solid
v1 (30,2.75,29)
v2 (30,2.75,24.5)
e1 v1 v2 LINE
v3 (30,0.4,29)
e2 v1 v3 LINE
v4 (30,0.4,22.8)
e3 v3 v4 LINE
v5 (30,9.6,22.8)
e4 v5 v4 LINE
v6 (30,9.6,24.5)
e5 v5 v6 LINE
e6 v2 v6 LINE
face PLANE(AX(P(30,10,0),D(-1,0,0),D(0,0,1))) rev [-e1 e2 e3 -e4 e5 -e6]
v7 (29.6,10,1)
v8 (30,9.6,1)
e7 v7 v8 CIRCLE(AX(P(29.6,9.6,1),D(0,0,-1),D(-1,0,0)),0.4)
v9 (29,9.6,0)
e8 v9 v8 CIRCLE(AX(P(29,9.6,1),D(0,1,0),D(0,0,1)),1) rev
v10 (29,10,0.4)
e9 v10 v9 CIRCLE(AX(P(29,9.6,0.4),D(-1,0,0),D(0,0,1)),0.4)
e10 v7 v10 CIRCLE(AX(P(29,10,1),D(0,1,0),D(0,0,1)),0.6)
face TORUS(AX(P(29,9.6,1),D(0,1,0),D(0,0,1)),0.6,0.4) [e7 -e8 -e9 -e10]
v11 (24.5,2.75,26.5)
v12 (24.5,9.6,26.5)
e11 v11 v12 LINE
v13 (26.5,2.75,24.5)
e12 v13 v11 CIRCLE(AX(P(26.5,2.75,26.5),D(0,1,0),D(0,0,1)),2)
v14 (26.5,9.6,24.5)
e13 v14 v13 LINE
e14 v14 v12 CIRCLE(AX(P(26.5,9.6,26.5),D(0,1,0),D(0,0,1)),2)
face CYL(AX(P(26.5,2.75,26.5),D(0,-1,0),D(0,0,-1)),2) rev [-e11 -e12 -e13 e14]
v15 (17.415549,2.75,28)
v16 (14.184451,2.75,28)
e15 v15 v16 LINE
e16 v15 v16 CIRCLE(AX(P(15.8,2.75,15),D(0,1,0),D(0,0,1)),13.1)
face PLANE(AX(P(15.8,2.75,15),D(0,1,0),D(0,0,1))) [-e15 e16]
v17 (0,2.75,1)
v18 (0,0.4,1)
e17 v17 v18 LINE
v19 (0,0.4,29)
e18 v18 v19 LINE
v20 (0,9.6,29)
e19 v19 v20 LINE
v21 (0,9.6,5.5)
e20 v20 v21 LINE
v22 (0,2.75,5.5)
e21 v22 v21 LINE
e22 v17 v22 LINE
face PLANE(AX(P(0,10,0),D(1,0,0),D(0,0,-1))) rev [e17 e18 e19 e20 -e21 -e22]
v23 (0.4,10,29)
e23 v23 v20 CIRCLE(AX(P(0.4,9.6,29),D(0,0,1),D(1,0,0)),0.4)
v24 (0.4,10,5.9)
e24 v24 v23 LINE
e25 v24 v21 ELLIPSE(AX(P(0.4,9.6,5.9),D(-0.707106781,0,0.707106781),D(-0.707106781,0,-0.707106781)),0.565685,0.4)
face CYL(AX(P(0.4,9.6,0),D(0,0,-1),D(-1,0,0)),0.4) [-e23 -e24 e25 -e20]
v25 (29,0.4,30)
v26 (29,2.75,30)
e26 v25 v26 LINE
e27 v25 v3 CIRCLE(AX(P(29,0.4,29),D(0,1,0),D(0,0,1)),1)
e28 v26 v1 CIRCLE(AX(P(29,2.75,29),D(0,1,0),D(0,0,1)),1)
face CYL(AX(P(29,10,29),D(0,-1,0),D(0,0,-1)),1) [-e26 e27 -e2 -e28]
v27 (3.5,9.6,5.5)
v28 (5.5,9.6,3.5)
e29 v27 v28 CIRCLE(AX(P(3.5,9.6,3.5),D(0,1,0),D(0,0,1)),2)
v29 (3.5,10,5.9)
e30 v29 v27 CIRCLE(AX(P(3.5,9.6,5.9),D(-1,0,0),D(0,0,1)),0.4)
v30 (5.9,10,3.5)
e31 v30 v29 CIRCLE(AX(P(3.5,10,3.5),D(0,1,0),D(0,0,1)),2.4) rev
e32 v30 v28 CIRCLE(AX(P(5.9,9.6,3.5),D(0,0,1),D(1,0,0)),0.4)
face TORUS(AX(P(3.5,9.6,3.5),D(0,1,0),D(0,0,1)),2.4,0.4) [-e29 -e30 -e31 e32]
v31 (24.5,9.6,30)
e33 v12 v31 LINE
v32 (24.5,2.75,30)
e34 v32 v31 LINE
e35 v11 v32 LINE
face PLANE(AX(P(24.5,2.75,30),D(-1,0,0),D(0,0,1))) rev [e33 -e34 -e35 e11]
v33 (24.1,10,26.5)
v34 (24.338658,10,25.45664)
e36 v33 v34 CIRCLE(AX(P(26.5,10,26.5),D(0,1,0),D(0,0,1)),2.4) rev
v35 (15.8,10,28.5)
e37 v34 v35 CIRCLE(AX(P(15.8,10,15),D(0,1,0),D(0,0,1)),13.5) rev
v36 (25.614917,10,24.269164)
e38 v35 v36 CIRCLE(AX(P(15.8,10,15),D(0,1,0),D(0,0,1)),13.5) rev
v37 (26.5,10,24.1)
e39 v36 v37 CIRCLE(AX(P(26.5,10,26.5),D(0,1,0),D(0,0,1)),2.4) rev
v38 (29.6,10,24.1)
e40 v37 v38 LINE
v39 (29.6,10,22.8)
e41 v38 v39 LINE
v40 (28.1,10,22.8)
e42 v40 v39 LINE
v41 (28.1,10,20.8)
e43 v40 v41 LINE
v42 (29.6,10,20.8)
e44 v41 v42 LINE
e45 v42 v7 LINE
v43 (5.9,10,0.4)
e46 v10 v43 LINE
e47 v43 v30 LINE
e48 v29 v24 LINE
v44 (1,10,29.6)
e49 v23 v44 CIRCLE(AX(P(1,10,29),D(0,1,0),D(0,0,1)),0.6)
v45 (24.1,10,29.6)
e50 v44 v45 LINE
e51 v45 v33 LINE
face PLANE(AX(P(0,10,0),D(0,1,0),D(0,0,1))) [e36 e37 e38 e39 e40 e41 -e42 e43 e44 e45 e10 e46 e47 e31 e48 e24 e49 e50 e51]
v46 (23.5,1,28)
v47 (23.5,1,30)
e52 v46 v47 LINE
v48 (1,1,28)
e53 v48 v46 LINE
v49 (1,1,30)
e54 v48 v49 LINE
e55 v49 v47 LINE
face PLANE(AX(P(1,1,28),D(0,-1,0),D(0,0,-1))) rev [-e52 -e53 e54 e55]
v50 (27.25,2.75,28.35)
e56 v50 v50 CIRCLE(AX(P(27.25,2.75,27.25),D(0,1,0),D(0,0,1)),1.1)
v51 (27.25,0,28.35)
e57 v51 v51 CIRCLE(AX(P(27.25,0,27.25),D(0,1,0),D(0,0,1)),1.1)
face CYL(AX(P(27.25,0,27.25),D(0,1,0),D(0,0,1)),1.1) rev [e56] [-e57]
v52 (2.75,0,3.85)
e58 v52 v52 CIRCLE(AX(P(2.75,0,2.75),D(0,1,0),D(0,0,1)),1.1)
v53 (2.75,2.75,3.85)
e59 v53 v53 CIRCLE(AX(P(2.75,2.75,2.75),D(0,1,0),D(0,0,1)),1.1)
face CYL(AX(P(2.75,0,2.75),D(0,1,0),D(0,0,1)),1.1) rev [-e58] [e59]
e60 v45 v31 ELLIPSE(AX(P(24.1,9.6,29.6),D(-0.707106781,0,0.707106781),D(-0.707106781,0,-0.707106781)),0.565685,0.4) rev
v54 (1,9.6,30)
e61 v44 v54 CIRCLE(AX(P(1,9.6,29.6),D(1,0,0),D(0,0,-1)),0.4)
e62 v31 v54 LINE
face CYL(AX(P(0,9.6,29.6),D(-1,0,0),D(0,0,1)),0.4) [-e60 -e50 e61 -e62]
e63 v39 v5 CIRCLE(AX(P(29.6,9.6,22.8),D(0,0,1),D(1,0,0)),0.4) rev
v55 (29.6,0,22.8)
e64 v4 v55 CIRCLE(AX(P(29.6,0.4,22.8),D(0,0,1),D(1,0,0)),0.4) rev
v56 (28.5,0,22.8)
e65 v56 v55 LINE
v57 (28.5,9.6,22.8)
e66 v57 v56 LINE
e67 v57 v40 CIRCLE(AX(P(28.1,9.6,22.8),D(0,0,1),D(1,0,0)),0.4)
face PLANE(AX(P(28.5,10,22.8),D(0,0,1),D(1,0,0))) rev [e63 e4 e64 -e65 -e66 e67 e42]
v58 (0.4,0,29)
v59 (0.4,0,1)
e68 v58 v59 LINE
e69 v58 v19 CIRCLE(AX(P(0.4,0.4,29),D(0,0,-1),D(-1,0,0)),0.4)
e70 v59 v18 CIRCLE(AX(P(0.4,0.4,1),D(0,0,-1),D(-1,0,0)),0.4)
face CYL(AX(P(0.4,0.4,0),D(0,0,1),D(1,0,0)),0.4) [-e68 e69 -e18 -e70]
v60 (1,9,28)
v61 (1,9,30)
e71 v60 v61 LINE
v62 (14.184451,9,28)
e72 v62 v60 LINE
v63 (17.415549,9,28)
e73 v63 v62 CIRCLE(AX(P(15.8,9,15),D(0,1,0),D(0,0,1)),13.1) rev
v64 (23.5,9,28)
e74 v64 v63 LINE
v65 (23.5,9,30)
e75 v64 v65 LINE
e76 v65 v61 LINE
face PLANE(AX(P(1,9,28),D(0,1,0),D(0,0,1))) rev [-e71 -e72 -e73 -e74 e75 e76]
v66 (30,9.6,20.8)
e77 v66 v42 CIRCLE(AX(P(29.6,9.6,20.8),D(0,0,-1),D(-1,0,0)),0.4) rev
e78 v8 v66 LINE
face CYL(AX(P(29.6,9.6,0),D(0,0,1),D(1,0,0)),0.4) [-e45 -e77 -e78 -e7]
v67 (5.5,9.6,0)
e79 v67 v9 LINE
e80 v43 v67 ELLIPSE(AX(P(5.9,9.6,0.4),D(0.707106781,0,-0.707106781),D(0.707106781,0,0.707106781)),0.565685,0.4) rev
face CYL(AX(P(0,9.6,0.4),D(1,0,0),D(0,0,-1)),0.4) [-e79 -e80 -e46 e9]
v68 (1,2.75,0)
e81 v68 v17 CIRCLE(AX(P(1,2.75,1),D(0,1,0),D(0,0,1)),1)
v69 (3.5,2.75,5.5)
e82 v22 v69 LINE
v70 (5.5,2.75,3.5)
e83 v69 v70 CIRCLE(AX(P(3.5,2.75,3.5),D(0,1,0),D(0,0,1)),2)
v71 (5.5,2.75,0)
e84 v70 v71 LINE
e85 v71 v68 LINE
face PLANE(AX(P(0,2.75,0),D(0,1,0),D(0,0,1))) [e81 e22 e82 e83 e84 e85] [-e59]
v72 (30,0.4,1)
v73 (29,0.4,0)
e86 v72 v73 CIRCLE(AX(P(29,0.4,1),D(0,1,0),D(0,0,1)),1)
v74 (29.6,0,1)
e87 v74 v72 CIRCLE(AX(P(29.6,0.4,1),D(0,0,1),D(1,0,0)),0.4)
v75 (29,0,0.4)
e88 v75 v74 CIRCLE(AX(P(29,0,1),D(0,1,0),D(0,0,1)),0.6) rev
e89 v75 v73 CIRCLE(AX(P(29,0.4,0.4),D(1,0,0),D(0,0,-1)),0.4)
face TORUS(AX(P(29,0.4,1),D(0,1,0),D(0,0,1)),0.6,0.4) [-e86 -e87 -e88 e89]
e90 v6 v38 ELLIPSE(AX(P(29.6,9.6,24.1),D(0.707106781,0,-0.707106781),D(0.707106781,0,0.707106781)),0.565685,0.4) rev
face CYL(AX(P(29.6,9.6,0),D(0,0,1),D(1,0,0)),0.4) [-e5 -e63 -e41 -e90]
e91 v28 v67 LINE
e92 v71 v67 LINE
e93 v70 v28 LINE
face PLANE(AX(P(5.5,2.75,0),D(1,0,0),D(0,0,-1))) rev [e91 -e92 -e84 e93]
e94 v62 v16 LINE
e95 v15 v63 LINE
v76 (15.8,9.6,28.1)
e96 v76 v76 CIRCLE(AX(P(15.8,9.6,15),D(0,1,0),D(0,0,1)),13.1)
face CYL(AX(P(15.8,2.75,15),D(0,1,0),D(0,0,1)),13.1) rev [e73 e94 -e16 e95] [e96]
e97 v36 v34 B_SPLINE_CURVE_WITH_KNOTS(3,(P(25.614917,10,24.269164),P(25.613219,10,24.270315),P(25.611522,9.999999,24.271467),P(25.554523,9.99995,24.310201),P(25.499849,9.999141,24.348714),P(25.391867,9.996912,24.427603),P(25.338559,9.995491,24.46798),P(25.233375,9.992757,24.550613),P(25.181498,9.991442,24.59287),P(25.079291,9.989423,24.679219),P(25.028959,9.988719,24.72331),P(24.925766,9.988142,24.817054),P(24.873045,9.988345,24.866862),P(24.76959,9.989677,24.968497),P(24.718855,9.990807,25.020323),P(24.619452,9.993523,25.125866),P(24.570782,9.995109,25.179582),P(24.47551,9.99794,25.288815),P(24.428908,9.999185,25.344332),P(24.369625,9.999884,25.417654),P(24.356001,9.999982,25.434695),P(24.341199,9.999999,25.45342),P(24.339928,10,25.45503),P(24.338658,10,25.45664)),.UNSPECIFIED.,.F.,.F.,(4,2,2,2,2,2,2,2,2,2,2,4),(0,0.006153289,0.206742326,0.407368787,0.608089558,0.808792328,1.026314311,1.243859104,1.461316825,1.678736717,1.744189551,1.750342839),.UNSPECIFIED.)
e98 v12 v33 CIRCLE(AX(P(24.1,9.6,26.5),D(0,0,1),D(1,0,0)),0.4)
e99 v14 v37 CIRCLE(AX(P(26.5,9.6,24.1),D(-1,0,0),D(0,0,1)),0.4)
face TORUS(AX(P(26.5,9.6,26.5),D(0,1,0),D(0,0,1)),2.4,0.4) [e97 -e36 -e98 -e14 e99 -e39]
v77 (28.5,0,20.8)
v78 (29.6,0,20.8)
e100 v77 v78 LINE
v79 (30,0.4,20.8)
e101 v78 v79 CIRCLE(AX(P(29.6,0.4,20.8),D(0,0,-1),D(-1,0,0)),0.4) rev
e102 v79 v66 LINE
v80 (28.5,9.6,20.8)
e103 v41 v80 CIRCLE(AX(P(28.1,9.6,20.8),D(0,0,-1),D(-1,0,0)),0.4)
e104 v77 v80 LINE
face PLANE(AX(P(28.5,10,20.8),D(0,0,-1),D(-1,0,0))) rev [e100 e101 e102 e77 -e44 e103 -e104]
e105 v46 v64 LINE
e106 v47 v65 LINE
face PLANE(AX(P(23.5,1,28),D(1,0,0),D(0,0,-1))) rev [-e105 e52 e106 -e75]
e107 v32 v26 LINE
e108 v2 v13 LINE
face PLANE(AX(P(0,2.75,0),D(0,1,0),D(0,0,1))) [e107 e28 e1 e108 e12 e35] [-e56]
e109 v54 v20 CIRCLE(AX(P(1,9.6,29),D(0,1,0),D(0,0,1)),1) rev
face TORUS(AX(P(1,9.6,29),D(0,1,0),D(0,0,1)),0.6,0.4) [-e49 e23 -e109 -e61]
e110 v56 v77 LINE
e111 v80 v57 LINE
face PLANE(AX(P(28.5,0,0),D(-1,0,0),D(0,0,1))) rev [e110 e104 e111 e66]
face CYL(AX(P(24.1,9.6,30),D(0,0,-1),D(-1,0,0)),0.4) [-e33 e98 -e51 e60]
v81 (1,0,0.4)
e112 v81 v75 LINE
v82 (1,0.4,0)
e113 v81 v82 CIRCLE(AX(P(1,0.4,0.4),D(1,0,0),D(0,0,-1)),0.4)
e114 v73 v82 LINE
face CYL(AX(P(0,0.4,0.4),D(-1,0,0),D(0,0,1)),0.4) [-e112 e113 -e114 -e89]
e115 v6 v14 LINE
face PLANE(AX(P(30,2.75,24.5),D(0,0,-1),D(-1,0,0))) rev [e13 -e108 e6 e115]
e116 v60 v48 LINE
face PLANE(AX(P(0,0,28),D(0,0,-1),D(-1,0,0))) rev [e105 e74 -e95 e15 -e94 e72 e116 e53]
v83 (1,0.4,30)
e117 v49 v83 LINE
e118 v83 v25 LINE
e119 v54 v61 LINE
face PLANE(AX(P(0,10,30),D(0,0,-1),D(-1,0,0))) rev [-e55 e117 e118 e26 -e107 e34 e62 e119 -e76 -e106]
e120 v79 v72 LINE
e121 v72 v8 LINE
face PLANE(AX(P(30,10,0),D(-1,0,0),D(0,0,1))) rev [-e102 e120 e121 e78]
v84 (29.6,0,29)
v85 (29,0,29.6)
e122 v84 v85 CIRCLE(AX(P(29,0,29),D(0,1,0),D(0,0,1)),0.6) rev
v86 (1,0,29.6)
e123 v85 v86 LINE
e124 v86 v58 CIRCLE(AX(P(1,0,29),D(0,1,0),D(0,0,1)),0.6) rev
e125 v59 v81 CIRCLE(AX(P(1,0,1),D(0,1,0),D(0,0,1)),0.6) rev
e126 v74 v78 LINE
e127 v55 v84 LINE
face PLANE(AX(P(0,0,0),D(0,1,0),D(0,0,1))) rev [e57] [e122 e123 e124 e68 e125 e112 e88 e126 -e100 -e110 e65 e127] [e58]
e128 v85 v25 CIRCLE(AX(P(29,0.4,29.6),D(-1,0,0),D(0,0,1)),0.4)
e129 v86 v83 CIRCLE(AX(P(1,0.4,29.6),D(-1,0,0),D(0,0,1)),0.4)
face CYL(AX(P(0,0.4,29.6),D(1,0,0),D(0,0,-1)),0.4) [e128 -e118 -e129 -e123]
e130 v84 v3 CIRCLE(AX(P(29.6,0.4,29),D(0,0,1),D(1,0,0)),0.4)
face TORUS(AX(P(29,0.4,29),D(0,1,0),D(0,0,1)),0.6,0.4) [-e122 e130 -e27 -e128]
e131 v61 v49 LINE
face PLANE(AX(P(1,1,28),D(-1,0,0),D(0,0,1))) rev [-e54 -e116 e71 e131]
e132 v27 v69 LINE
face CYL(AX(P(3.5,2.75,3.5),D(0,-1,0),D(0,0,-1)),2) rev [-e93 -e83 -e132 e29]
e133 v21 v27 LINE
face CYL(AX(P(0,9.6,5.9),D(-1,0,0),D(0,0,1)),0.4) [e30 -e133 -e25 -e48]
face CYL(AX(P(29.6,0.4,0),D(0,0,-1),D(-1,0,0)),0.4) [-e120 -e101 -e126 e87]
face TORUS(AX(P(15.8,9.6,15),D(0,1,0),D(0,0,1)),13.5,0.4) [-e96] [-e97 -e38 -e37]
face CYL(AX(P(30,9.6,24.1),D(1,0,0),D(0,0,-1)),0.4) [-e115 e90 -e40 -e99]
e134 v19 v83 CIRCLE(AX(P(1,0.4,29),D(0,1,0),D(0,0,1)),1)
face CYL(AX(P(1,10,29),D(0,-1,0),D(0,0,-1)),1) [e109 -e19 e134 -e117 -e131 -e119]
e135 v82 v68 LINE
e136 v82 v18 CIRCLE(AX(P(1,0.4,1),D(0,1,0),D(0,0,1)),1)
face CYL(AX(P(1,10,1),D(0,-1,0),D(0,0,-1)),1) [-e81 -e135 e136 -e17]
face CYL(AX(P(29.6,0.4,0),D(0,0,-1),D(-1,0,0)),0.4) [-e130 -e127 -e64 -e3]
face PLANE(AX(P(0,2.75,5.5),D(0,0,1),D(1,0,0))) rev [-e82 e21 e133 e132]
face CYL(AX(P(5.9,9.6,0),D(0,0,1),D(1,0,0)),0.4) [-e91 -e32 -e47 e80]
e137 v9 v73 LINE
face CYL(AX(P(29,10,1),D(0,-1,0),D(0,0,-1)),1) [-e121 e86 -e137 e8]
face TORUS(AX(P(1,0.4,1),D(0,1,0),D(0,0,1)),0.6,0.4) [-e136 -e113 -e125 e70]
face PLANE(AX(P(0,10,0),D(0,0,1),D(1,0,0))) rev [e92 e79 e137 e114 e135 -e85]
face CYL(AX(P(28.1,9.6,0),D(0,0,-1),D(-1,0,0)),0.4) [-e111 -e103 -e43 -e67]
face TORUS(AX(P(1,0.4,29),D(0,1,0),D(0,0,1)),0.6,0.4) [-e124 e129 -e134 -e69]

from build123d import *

# Parameters (mm, degrees)
SKETCH1_W           = 30
SKETCH1_H           = 30
BOSS_EXTRUDE1_DEPTH = 10
SKETCH2_W           = 5.5
SKETCH2_H           = 5.5
CUT_EXTRUDE1_DEPTH  = 7.25
FILLET1_R           = 2
SKETCH3_R           = 13.1
CUT_EXTRUDE2_DEPTH  = 7.25
SKETCH4_R           = 1.1
CUT_EXTRUDE3_DEPTH  = 44.041404485
SKETCH5_W           = 22.5
SKETCH5_H           = 8
CUT_EXTRUDE4_DEPTH  = 2
SKETCH6_W           = 2
SKETCH6_H           = 10
CUT_EXTRUDE5_DEPTH  = 1.5
FILLET2_R           = 1
FILLET3_R           = 0.4


# Some blends are built 0.0001 mm under size
with BuildPart() as part:
    # Sketch1 → Boss-Extrude1 (new body)
    with BuildSketch(Plane(origin=(0, 0, 0), x_dir=(1, 0, 0), z_dir=(0, 1, 0))):
        with Locations((15, -15)):
            Rectangle(SKETCH1_W, SKETCH1_H)
    extrude(amount=BOSS_EXTRUDE1_DEPTH)

    # Sketch2 → Cut-Extrude1 (cut)
    with BuildSketch(Plane(origin=(0, 10, 0), x_dir=(1, 0, 0), z_dir=(0, 1, 0))):
        with Locations((27.25, -27.25)):
            Rectangle(SKETCH2_W, SKETCH2_H)
        with Locations((2.75, -2.75)):
            Rectangle(SKETCH2_W, SKETCH2_H)
    extrude(amount=-CUT_EXTRUDE1_DEPTH, mode=Mode.SUBTRACT)

    # Fillet1
    fillet1_edges = [part.edges().sort_by_distance(p)[0] for p in [
        (24.5, 6.375, 24.5),
        (5.5, 6.375, 5.5),
    ]]
    fillet(fillet1_edges, radius=FILLET1_R)

    # Sketch3 → Cut-Extrude2 (cut)
    with BuildSketch(Plane(origin=(0, 10, 0), x_dir=(1, 0, 0), z_dir=(0, 1, 0))):
        with Locations(Location((15.8, -15, 0), (0, 0, 270))):
            Circle(SKETCH3_R)
    extrude(amount=-CUT_EXTRUDE2_DEPTH, mode=Mode.SUBTRACT)

    # Sketch4 → Cut-Extrude3 (cut, through all)
    with BuildSketch(Plane(origin=(0, 2.75, 0), x_dir=(1, 0, 0), z_dir=(0, 1, 0))):
        with Locations(Location((2.75, -2.75, 0), (0, 0, 270))):
            Circle(SKETCH4_R)
        with Locations(Location((27.25, -27.25, 0), (0, 0, 270))):
            Circle(SKETCH4_R)
    extrude(amount=-CUT_EXTRUDE3_DEPTH, mode=Mode.SUBTRACT)

    # Sketch5 → Cut-Extrude4 (cut)
    with BuildSketch(Plane.XY.offset(30)):
        with Locations((12.25, 5)):
            Rectangle(SKETCH5_W, SKETCH5_H)
    extrude(amount=-CUT_EXTRUDE4_DEPTH, mode=Mode.SUBTRACT)

    # Sketch6 → Cut-Extrude5 (cut)
    with BuildSketch(Plane(origin=(30, 0, 0), x_dir=(0, 0, -1), z_dir=(1, 0, 0))):
        with Locations((-21.8, 5)):
            Rectangle(SKETCH6_W, SKETCH6_H)
    extrude(amount=-CUT_EXTRUDE5_DEPTH, mode=Mode.SUBTRACT)

    # Fillet2
    fillet2_edges = [part.edges().sort_by_distance(p)[0] for p in [
        (30, 1.375, 30),
        (0, 1.375, 0),
        (30, 5, 0),
        (0, 5, 30),
    ]]
    fillet(fillet2_edges, radius=FILLET2_R - 0.0001)  # a hair under: the kernel refuses the full size

    # Fillet3
    # the kernel refuses this fillet: 0.4 mm, written as the material it takes off along each edge
    with BuildSketch(Plane(origin=(4.5, 10, 0), x_dir=(0, 0, 1), z_dir=(1, 0, 0)), Plane(origin=(25.5, 10, 30), x_dir=(0, 0, -1), z_dir=(-1, 0, 0)), Plane(origin=(0, 10, 29.0001), x_dir=(1, 0, 0), z_dir=(0, 0, -1))) as fillet3_piece_1:
        with BuildLine():
            CenterArc((FILLET3_R, FILLET3_R), FILLET3_R, 180, 90)
            Line((0, FILLET3_R), (0, 0))
            Line((0, 0), (FILLET3_R, 0))
        make_face()
    extrude(amount=24.5001, mode=Mode.SUBTRACT)
    with BuildSketch(Plane(origin=(0.9999, 0, 0), x_dir=(0, 1, 0), z_dir=(1, 0, 0)), Plane(origin=(29.0001, 0, 30), x_dir=(0, 1, 0), z_dir=(-1, 0, 0)), Plane(origin=(0, 0, 29.0001), x_dir=(0, 1, 0), z_dir=(0, 0, -1))) as fillet3_piece_2:
        with BuildLine():
            CenterArc((FILLET3_R, FILLET3_R), FILLET3_R, 180, 90)
            Line((0, FILLET3_R), (0, 0))
            Line((0, 0), (FILLET3_R, 0))
        make_face()
    extrude(amount=28.0002, mode=Mode.SUBTRACT)
    with BuildSketch(Plane(origin=(30, 0, 21.8), x_dir=(0, 1, 0), z_dir=(0, 0, 1))) as fillet3_piece_3:
        with BuildLine():
            CenterArc((FILLET3_R, FILLET3_R), FILLET3_R, 180, 90)
            Line((0, FILLET3_R), (0, 0))
            Line((0, 0), (FILLET3_R, 0))
        make_face()
    extrude(amount=7.2001, mode=Mode.SUBTRACT)
    with BuildSketch(Plane(origin=(0.9999, 0, 0.9999), x_dir=(-1, 0, 0), z_dir=(0, 0, 1))) as fillet3_piece_4:
        with BuildLine():
            CenterArc((0.9999 - FILLET3_R, -FILLET3_R), FILLET3_R, 0, 90)
            Line((0.9999, -FILLET3_R), (0.9999, 0))
            Line((0.9999, 0), (0.9999 - FILLET3_R, 0))
        make_face()
    revolve(axis=Axis((0.9999, 0, 0.9999), (0, -1, 0)), revolution_arc=90, mode=Mode.SUBTRACT)
    with BuildSketch(Plane(origin=(0.9999, 0, 29.0001), x_dir=(-1, 0, 0), z_dir=(0, 0, -1))) as fillet3_piece_5:
        with BuildLine():
            CenterArc((0.9999 - FILLET3_R, FILLET3_R), FILLET3_R, 270, 90)
            Line((0.9999 - FILLET3_R, 0), (0.9999, 0))
            Line((0.9999, 0), (0.9999, FILLET3_R))
        make_face()
    revolve(axis=Axis((0.9999, 0, 29.0001), (0, 1, 0)), revolution_arc=90, mode=Mode.SUBTRACT)
    with BuildSketch(Plane(origin=(29.0001, 0, 29.0001), x_dir=(0, 0, 1), z_dir=(-1, 0, 0))) as fillet3_piece_6:
        with BuildLine():
            CenterArc((0.9999 - FILLET3_R, FILLET3_R), FILLET3_R, 270, 90)
            Line((0.9999, FILLET3_R), (0.9999, 0))
            Line((0.9999, 0), (0.9999 - FILLET3_R, 0))
        make_face()
    revolve(axis=Axis((29.0001, 0, 29.0001), (0, 1, 0)), revolution_arc=90, mode=Mode.SUBTRACT)
    with BuildSketch(Plane(origin=(29.0001, 0, 0.9999), x_dir=(1, 0, 0), z_dir=(0, 0, 1))) as fillet3_piece_7:
        with BuildLine():
            CenterArc((0.9999 - FILLET3_R, FILLET3_R), FILLET3_R, 270, 90)
            Line((0.9999 - FILLET3_R, 0), (0.9999, 0))
            Line((0.9999, 0), (0.9999, FILLET3_R))
        make_face()
    revolve(axis=Axis((29.0001, 0, 0.9999), (0, 1, 0)), revolution_arc=90, mode=Mode.SUBTRACT)
    with BuildSketch(Plane(origin=(0.9999, 10, 29.0001), x_dir=(-1, 0, 0), z_dir=(0, 0, -1))) as fillet3_piece_8:
        with BuildLine():
            CenterArc((0.9999 - FILLET3_R, -FILLET3_R), FILLET3_R, 0, 90)
            Line((0.9999, -FILLET3_R), (0.9999, 0))
            Line((0.9999, 0), (0.9999 - FILLET3_R, 0))
        make_face()
    revolve(axis=Axis((0.9999, 10, 29.0001), (0, 1, 0)), revolution_arc=90, mode=Mode.SUBTRACT)
    with BuildSketch(Plane(origin=(29.0001, 10, 0.9999), x_dir=(1, 0, 0), z_dir=(0, 0, 1))) as fillet3_piece_9:
        with BuildLine():
            CenterArc((0.9999 - FILLET3_R, -FILLET3_R), FILLET3_R, 0, 90)
            Line((0.9999, -FILLET3_R), (0.9999, 0))
            Line((0.9999, 0), (0.9999 - FILLET3_R, 0))
        make_face()
    revolve(axis=Axis((29.0001, 10, 0.9999), (0, 1, 0)), revolution_arc=90, mode=Mode.SUBTRACT)
    with BuildSketch(Plane(origin=(30, 10, 21.8), x_dir=(-1, 0, 0), z_dir=(0, 0, 1))) as fillet3_piece_10:
        with BuildLine():
            CenterArc((FILLET3_R, FILLET3_R), FILLET3_R, 180, 90)
            Line((0, FILLET3_R), (0, 0))
            Line((0, 0), (FILLET3_R, 0))
        make_face()
    extrude(amount=3.7, mode=Mode.SUBTRACT)
    with BuildSketch(Plane(origin=(26.5, 10, 24.5), x_dir=(0, 0, -1), z_dir=(1, 0, 0)), Plane(origin=(3.5, 10, 5.5), x_dir=(0, 0, 1), z_dir=(-1, 0, 0)), Plane(origin=(5.5, 10, -1), x_dir=(1, 0, 0), z_dir=(0, 0, 1)), Plane(origin=(24.5, 10, 31), x_dir=(-1, 0, 0), z_dir=(0, 0, -1))) as fillet3_piece_11:
        with BuildLine():
            CenterArc((FILLET3_R, -FILLET3_R), FILLET3_R, 90, 90)
            Line((0, -FILLET3_R), (0, 0))
            Line((0, 0), (FILLET3_R, 0))
        make_face()
    extrude(amount=4.5, mode=Mode.SUBTRACT)
    with BuildSketch(Plane(origin=(3.5, 10, 3.5), x_dir=(1, 0, 0), z_dir=(0, 0, -1))) as fillet3_piece_12:
        with BuildLine():
            CenterArc((2 + FILLET3_R, FILLET3_R), FILLET3_R, 180, 90)
            Line((2, FILLET3_R), (2, 0))
            Line((2, 0), (2 + FILLET3_R, 0))
        make_face()
    revolve(axis=Axis((3.5, 10, 3.5), (0, -1, 0)), revolution_arc=90, mode=Mode.SUBTRACT)
    with BuildSketch(Plane(origin=(26.5, 10, 26.5), x_dir=(0, 0, -1), z_dir=(1, 0, 0))) as fillet3_piece_13:
        with BuildLine():
            CenterArc((2 + FILLET3_R, -FILLET3_R), FILLET3_R, 90, 90)
            Line((2, -FILLET3_R), (2, 0))
            Line((2, 0), (2 + FILLET3_R, 0))
        make_face()
    revolve(axis=Axis((26.5, 10, 26.5), (0, 1, 0)), revolution_arc=90, mode=Mode.SUBTRACT)
    with BuildSketch(Plane(origin=(15.8, 10, 15), x_dir=(0, 0, 1), z_dir=(-1, 0, 0))) as fillet3_piece_14:
        with BuildLine():
            CenterArc((13.1 + FILLET3_R, -FILLET3_R), FILLET3_R, 90, 90)
            Line((13.1, -FILLET3_R), (13.1, 0))
            Line((13.1, 0), (13.1 + FILLET3_R, 0))
        make_face()
    revolve(axis=Axis((15.8, 10, 15), (0, 1, 0)), mode=Mode.SUBTRACT)
    with BuildSketch(Plane(origin=(30, 0, 0.9999), x_dir=(0, 1, 0), z_dir=(0, 0, 1)), Plane(origin=(30, 10, 0.9999), x_dir=(-1, 0, 0), z_dir=(0, 0, 1))) as fillet3_piece_15:
        with BuildLine():
            CenterArc((FILLET3_R, FILLET3_R), FILLET3_R, 180, 90)
            Line((0, FILLET3_R), (0, 0))
            Line((0, 0), (FILLET3_R, 0))
        make_face()
    extrude(amount=20.8001, mode=Mode.SUBTRACT)
    with BuildSketch(Plane(origin=(28.5, 10, 20.8), x_dir=(-1, 0, 0), z_dir=(0, 0, 1))) as fillet3_piece_16:
        with BuildLine():
            CenterArc((FILLET3_R, FILLET3_R), FILLET3_R, 180, 90)
            Line((0, FILLET3_R), (0, 0))
            Line((0, 0), (FILLET3_R, 0))
        make_face()
    extrude(amount=2, mode=Mode.SUBTRACT)


solid = part.part
